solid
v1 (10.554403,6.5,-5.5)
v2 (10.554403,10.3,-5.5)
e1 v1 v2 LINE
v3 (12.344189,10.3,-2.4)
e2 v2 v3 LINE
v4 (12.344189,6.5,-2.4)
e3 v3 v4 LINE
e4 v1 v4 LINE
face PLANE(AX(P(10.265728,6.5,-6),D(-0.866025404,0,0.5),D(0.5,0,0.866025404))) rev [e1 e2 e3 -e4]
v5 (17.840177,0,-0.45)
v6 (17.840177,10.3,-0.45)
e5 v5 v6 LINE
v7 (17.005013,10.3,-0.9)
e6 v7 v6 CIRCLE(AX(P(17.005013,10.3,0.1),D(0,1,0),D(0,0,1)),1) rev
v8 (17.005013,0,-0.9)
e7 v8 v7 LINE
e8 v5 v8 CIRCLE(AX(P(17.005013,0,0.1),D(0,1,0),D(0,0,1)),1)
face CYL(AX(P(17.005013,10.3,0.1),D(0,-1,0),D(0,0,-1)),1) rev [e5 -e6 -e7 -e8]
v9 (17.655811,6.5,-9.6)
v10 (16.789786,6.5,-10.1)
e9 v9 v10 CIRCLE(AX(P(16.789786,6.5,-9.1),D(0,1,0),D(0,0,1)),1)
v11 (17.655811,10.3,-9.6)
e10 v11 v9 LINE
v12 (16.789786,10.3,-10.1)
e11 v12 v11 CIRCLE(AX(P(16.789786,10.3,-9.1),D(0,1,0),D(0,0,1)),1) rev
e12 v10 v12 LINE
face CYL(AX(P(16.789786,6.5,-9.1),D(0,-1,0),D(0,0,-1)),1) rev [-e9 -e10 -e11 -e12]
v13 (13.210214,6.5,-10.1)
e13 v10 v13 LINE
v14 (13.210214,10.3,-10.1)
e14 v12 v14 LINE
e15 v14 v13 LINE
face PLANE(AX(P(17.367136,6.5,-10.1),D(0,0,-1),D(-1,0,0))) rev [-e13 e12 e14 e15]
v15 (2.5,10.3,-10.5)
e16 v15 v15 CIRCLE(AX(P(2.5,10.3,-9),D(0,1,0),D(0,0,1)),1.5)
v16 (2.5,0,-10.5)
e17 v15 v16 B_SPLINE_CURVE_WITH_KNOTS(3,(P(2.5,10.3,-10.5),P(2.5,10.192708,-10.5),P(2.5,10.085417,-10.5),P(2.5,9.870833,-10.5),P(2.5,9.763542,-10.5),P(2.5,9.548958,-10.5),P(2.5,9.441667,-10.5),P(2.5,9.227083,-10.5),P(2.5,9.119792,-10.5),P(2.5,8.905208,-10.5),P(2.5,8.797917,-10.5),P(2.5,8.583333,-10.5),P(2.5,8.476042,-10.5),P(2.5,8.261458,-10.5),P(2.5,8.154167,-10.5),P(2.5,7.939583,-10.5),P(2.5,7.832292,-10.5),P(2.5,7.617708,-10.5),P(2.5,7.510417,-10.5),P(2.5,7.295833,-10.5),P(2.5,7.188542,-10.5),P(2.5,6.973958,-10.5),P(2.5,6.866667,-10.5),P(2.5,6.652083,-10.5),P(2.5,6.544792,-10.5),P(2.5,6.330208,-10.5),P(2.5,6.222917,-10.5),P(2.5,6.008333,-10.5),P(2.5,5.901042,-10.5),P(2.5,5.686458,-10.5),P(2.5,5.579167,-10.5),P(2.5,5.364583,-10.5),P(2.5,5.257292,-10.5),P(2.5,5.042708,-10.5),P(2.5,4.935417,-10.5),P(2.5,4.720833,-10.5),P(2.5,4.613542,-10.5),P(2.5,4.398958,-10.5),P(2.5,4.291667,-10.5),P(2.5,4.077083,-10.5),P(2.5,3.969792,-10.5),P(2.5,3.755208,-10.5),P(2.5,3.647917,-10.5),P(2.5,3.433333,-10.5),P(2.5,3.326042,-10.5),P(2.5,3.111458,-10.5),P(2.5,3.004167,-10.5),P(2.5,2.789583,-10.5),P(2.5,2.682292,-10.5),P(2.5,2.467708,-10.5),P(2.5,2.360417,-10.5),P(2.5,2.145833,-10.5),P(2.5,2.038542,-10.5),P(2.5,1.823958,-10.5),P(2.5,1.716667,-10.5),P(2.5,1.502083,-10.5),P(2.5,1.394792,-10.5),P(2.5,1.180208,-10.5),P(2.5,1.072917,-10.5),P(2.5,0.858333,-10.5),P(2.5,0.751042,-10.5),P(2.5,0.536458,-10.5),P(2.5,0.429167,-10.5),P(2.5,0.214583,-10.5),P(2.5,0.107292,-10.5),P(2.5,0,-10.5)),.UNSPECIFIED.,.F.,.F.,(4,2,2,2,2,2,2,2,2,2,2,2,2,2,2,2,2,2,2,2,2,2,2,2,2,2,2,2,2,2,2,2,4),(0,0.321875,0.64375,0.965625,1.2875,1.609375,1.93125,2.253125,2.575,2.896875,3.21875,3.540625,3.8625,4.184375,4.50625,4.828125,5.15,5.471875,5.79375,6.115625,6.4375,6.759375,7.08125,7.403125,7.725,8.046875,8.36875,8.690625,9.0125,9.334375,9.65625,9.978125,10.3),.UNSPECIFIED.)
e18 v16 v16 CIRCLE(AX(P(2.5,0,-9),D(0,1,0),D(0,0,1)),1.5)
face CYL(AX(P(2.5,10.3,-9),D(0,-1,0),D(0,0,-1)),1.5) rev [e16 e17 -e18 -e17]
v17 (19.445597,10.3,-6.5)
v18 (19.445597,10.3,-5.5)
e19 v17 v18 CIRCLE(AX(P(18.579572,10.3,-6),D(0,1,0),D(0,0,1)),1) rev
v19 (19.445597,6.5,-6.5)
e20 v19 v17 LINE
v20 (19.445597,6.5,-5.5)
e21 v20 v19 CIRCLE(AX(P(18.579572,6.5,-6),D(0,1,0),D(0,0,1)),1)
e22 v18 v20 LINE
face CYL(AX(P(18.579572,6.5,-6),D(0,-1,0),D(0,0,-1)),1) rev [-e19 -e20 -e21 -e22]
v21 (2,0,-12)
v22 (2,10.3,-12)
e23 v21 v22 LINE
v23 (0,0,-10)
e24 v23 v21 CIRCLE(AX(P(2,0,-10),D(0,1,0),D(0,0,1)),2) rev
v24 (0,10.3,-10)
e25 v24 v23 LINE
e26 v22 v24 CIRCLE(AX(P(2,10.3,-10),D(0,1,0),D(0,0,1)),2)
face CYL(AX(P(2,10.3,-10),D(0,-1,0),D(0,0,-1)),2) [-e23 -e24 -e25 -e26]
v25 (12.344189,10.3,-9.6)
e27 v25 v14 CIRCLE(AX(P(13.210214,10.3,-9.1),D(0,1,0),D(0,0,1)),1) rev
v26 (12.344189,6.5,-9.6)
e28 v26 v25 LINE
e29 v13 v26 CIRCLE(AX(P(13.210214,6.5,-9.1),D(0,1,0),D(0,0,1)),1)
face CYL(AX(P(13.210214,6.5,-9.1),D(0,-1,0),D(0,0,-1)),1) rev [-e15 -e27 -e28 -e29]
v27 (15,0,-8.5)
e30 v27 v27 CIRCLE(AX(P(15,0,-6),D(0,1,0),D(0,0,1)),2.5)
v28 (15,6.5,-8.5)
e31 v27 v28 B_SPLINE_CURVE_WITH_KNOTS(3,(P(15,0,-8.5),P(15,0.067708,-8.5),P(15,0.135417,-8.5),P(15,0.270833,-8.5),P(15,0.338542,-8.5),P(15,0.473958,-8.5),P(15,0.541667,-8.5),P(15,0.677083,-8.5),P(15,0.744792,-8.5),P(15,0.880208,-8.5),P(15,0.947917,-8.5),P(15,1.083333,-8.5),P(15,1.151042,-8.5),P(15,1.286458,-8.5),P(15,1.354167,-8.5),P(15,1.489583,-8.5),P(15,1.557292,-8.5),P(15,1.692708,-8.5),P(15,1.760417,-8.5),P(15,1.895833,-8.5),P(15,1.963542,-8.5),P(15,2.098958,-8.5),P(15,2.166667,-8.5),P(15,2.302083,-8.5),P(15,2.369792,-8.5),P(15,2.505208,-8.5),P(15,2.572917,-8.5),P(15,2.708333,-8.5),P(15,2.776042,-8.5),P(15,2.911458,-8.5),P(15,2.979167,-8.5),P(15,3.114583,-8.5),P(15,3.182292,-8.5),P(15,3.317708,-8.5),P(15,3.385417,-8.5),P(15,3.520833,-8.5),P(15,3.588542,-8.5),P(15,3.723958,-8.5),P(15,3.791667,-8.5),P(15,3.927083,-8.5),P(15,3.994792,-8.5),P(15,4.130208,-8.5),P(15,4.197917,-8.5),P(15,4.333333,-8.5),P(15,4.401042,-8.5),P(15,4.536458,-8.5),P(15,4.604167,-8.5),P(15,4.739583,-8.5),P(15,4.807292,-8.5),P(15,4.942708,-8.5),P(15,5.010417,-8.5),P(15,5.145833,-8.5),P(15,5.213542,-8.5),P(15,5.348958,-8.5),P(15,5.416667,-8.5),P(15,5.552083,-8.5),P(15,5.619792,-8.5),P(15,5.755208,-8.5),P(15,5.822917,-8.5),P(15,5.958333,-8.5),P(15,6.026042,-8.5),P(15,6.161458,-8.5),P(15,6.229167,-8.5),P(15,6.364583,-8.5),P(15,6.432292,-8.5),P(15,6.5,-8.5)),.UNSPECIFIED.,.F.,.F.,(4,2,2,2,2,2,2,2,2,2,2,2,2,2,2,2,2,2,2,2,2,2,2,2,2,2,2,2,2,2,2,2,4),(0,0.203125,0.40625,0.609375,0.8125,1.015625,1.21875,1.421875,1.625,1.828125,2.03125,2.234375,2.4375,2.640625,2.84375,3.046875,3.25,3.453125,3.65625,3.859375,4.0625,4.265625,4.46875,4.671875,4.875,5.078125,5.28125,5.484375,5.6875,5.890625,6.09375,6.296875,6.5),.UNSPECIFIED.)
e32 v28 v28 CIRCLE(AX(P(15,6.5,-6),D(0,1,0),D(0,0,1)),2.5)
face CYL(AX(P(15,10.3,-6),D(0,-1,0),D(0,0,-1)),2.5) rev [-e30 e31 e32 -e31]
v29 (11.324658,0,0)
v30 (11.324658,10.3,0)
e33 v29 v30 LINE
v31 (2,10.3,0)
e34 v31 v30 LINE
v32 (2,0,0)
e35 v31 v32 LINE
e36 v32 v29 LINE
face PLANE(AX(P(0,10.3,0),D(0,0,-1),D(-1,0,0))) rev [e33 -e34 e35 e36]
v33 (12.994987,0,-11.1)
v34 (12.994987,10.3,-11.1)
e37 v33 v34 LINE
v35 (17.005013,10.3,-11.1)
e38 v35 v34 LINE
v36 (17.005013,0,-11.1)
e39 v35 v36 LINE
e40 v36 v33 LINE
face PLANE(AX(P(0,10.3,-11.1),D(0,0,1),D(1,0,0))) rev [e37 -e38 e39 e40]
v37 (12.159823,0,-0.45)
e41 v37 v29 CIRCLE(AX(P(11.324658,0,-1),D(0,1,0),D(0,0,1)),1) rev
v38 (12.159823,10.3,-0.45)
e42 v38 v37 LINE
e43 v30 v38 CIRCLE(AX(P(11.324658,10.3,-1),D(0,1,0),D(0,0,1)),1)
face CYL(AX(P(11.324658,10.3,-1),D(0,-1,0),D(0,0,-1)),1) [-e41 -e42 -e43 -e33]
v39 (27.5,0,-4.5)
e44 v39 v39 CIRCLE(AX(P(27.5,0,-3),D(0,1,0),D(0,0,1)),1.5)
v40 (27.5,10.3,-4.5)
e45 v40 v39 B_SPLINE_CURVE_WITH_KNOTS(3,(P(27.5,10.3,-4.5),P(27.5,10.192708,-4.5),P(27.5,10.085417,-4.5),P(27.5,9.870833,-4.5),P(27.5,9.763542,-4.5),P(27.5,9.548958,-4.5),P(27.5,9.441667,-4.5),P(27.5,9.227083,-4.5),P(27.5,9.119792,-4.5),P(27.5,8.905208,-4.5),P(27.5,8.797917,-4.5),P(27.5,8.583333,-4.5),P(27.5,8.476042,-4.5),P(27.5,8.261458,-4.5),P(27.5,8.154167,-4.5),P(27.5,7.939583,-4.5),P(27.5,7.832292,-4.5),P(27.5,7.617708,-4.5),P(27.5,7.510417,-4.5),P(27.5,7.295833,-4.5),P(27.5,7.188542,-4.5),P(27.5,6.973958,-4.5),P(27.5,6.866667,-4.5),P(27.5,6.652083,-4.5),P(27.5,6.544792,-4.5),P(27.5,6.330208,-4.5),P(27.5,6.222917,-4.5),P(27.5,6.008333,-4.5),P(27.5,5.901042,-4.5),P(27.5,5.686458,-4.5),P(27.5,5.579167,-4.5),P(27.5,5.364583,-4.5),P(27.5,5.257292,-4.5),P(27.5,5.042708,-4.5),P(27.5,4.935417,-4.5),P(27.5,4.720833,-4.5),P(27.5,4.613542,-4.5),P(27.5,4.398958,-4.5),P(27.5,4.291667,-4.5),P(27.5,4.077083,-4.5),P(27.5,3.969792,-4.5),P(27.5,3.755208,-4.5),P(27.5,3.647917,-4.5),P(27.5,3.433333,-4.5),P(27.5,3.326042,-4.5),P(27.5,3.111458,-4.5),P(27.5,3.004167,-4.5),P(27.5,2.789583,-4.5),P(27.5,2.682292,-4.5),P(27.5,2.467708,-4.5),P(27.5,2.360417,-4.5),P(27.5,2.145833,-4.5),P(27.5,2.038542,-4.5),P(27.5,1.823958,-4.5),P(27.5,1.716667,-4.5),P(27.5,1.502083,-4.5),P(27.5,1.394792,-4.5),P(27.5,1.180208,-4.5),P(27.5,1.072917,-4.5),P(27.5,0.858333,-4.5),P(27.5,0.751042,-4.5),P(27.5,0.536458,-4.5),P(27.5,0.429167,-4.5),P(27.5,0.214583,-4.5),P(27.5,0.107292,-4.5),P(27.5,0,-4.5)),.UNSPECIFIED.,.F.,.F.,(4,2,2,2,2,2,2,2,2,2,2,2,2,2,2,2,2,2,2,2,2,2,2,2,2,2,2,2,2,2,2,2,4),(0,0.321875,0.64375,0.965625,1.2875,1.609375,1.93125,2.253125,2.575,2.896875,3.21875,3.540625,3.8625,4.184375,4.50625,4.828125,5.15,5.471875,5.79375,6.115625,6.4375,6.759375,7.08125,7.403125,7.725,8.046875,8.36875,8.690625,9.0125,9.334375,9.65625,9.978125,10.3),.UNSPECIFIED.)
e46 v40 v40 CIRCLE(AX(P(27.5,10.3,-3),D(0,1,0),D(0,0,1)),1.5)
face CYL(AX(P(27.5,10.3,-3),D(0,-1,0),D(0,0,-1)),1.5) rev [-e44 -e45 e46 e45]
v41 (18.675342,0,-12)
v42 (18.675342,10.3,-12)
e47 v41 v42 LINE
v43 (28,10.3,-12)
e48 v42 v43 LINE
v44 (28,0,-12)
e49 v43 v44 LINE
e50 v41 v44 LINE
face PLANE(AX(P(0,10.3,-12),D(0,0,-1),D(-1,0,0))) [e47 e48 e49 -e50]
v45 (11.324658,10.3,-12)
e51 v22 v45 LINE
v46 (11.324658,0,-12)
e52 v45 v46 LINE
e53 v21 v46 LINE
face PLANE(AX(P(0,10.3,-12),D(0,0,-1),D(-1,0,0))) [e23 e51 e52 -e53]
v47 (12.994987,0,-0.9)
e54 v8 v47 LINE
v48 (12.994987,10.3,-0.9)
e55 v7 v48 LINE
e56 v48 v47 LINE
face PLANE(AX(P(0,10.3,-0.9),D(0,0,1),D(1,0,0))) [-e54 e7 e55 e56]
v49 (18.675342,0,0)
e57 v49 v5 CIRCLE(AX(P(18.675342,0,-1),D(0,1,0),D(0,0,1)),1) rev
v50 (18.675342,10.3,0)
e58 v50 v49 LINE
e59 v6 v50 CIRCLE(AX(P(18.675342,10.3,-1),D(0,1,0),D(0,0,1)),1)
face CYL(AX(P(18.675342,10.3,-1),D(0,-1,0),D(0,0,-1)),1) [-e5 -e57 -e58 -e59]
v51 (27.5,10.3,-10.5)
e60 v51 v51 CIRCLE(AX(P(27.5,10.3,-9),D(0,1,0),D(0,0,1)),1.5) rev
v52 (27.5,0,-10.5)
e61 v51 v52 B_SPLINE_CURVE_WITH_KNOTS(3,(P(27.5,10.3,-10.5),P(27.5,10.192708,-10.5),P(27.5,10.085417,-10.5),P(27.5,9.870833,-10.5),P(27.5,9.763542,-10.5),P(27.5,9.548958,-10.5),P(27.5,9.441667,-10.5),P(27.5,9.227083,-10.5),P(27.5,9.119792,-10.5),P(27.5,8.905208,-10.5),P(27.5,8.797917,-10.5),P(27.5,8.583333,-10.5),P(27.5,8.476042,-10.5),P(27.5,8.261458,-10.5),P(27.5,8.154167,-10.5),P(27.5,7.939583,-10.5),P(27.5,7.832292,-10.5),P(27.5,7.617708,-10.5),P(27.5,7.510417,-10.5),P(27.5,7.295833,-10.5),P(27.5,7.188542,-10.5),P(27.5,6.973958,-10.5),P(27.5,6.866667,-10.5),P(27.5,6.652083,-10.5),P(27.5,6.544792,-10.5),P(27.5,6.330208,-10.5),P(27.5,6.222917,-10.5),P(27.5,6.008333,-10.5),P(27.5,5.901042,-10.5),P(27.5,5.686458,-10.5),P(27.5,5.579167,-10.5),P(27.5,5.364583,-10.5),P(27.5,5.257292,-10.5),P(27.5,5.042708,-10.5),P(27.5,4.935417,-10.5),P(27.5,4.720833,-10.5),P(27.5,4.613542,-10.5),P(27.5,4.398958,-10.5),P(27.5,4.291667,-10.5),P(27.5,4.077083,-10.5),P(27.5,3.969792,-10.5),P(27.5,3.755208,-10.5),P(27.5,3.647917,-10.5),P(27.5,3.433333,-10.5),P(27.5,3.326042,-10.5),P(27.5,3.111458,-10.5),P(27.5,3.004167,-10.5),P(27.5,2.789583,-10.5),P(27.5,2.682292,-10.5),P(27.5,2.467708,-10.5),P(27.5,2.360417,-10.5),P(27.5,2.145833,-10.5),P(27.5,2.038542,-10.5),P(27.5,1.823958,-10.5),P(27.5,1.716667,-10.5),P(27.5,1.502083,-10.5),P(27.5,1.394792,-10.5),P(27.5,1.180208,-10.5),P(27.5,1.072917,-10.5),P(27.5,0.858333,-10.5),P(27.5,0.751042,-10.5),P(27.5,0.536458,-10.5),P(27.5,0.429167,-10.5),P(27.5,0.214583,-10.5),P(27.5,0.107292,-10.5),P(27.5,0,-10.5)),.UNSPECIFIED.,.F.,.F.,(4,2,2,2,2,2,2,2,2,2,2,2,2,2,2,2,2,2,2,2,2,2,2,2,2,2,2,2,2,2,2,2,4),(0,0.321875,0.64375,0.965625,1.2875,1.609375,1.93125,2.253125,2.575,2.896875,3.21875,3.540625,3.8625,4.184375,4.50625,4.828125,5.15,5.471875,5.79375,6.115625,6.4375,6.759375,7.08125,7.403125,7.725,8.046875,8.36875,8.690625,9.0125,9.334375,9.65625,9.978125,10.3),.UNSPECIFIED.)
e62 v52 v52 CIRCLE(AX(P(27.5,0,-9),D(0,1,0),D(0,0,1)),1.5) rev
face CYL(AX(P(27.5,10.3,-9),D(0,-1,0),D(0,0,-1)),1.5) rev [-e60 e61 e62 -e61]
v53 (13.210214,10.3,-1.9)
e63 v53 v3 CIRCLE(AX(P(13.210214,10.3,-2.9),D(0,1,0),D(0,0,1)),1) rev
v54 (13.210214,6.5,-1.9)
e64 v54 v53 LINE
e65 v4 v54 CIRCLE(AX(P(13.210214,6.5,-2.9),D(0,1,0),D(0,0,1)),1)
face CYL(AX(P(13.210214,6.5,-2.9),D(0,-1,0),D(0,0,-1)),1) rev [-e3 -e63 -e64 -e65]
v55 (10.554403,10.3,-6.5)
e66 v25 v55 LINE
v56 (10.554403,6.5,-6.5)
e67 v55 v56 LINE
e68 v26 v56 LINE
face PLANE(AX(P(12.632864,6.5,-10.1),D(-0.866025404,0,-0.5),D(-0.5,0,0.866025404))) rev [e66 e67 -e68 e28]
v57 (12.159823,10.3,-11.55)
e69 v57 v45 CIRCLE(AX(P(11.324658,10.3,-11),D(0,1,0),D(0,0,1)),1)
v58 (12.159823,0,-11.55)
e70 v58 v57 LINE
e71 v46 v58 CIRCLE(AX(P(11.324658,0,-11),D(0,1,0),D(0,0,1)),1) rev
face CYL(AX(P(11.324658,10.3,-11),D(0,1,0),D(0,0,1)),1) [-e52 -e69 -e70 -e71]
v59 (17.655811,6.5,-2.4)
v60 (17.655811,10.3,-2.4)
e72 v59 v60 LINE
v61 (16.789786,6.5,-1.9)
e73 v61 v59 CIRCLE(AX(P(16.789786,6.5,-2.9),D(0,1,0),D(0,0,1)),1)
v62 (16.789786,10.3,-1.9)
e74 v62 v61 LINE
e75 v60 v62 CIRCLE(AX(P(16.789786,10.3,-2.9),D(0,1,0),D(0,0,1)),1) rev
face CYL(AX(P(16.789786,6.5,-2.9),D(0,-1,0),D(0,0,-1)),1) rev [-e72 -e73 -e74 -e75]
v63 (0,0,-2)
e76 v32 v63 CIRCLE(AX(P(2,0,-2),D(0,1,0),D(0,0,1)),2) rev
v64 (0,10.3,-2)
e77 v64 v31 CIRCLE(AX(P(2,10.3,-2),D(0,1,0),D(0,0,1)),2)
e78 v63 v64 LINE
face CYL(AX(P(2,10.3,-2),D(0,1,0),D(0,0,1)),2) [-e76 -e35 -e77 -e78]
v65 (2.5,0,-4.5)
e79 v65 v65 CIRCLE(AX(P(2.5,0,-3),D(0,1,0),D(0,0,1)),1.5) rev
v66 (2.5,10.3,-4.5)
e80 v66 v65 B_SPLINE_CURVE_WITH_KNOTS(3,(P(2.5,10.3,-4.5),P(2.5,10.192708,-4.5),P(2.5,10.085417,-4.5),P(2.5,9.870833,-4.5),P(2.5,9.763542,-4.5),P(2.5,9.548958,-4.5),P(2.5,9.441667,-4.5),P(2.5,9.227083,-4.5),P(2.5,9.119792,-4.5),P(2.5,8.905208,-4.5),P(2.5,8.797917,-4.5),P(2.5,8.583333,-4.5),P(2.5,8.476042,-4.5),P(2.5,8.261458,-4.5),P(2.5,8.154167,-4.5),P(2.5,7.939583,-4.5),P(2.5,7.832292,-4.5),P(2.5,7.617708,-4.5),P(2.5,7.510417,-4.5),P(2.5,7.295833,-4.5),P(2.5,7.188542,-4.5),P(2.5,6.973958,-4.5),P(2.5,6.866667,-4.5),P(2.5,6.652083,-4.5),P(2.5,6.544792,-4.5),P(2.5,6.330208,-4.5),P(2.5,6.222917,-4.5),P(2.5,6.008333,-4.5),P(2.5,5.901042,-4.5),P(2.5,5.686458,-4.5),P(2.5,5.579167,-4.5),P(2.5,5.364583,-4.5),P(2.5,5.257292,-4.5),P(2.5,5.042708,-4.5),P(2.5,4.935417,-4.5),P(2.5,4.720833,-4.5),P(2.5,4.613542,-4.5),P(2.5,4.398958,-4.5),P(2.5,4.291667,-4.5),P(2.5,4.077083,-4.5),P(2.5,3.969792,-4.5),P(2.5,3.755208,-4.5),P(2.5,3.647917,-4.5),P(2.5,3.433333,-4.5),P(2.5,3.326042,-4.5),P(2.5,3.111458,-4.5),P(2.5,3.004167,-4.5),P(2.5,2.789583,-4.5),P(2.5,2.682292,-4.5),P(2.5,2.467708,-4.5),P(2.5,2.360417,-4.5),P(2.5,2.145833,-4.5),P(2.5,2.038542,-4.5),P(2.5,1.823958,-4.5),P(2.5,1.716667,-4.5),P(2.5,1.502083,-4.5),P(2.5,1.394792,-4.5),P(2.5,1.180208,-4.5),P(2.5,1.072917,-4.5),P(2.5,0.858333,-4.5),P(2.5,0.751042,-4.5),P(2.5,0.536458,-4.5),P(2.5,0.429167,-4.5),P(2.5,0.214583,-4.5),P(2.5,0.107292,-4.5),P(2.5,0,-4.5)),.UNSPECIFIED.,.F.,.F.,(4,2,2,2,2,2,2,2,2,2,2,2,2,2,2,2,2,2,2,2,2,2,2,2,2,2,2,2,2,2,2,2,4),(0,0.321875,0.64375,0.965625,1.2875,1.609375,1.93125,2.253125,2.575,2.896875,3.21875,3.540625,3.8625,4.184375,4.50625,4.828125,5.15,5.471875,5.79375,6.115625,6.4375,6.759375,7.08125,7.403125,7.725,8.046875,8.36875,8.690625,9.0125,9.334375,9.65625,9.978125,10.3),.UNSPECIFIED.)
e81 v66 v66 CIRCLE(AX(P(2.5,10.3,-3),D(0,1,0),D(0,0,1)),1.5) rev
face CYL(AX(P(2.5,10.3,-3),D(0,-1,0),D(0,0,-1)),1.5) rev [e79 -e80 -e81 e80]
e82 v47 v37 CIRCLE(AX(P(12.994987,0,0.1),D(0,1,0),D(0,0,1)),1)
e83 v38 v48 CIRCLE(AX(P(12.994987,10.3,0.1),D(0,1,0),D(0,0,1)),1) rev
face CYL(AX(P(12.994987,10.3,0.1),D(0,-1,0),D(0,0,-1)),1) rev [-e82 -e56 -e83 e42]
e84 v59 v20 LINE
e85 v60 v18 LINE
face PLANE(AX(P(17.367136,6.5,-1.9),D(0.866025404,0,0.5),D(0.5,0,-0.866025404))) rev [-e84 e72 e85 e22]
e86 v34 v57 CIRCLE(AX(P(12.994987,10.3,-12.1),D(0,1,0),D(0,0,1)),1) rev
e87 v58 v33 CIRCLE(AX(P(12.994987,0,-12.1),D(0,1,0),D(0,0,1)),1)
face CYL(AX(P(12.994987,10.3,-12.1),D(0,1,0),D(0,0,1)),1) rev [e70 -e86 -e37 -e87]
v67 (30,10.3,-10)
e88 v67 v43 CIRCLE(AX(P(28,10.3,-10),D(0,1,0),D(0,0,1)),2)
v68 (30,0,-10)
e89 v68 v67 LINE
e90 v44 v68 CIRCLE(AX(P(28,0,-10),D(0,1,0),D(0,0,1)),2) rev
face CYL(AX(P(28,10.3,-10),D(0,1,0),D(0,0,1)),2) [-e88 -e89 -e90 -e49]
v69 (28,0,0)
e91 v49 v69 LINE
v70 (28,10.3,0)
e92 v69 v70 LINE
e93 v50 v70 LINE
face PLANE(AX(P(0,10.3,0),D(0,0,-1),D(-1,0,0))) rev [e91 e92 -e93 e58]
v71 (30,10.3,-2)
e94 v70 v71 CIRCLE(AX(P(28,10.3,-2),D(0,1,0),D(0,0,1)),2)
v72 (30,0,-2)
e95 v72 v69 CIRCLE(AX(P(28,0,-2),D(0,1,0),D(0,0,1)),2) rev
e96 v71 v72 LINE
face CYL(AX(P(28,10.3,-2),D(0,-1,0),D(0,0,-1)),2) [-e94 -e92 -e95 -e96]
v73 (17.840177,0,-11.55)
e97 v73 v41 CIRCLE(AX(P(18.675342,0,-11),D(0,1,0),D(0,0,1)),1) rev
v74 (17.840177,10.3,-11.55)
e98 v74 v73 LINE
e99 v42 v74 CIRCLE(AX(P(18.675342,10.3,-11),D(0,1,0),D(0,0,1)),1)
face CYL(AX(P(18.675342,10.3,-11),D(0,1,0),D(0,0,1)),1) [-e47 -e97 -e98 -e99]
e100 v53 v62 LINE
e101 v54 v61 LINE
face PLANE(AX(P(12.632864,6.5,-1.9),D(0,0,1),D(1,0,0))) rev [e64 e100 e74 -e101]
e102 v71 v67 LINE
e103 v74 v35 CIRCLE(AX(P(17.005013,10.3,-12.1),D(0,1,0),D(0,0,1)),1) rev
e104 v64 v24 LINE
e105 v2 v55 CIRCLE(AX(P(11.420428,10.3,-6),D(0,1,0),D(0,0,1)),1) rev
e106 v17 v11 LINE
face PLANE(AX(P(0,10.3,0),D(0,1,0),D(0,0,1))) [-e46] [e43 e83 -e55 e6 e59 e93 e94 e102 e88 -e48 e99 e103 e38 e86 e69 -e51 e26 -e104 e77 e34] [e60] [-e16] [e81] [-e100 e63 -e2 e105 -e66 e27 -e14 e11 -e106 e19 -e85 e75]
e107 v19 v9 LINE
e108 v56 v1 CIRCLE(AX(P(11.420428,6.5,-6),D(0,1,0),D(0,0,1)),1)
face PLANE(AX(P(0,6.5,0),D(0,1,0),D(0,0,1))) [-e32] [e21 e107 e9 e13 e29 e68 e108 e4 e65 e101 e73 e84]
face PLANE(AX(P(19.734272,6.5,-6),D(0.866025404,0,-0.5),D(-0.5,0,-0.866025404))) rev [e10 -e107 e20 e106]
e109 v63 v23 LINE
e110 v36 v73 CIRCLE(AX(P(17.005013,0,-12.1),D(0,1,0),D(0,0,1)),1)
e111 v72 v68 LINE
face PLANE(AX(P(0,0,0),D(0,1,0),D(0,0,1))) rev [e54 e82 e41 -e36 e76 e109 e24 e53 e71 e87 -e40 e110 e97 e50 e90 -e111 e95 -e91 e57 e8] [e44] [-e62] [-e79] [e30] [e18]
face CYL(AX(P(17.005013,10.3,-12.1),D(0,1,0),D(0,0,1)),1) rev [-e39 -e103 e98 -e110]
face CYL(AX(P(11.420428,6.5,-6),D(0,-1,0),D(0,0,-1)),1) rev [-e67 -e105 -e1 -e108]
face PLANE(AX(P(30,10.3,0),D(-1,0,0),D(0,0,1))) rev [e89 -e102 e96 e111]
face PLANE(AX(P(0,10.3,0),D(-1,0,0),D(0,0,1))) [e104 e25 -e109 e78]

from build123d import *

# Parameters (mm, degrees)
SKETCH_1_R          = 1.5
SKETCH_1_R_2        = 2.5
EXTRUDE_1_DEPTH     = 10.3
CUT_EXTRUDE_1_DEPTH = 3.8
FILLET_1_R          = 2
FILLET_2_R          = 1
FILLET_3_R          = 1
FILLET_4_R          = 1


with BuildPart() as part:
    # 草图1 → 凸台-拉伸1 (new body)
    with BuildSketch(Plane(origin=(0, 0, 0), x_dir=(1, 0, 0), z_dir=(0, 1, 0))):
        Polygon((0, 12), (0, 0), (12, 0), (12, 0.9), (18, 0.9), (18, 0), (30, 0), (30, 12), (18, 12), (18, 11.1), (12, 11.1), (12, 12), align=None)
        with Locations(Location((2.5, 3, 0), (0, 0, 90))):
            Circle(SKETCH_1_R, mode=Mode.SUBTRACT)
        with Locations(Location((15, 6, 0), (0, 0, 90))):
            Circle(SKETCH_1_R_2, mode=Mode.SUBTRACT)
        with Locations(Location((27.5, 3, 0), (0, 0, 90))):
            Circle(SKETCH_1_R, mode=Mode.SUBTRACT)
        with Locations(Location((2.5, 9, 0), (0, 0, 90))):
            Circle(SKETCH_1_R, mode=Mode.SUBTRACT)
        with Locations(Location((27.5, 9, 0), (0, 0, 90))):
            Circle(SKETCH_1_R, mode=Mode.SUBTRACT)
    extrude(amount=EXTRUDE_1_DEPTH)

    # 草图2 → 切除-拉伸1 (cut)
    with BuildSketch(Plane(origin=(0, 10.3, 0), x_dir=(1, 0, 0), z_dir=(0, 1, 0))):
        Polygon((10.265727793, 6), (12.632863896, 1.9), (17.367136104, 1.9), (19.734272207, 6), (17.367136104, 10.1), (12.632863896, 10.1), align=None)
    extrude(amount=-CUT_EXTRUDE_1_DEPTH, mode=Mode.SUBTRACT)

    # 圆角1
    fillet_1_edges = [part.edges().sort_by_distance(p)[0] for p in [
        (30, 5.15, -12),
        (30, 5.15, 0),
        (0, 5.15, 0),
        (0, 5.15, -12),
    ]]
    fillet(fillet_1_edges, radius=FILLET_1_R)

    # 圆角2
    fillet_2_edges = [part.edges().sort_by_distance(p)[0] for p in [
        (10.265727793, 8.4, -6),
        (12.632863896, 8.4, -10.1),
        (17.367136104, 8.4, -10.1),
        (19.734272207, 8.4, -6),
        (17.367136104, 8.4, -1.9),
        (12.632863896, 8.4, -1.9),
    ]]
    fillet(fillet_2_edges, radius=FILLET_2_R)

    # 圆角3
    # the kernel refuses this fillet: 1 mm, written as the material it adds along each edge
    with BuildSketch(Plane(origin=(12, 0, -0.9), x_dir=(0, 0, 1), z_dir=(0, 1, 0))) as fillet_3_piece_1:
        with BuildLine():
            CenterArc((1, 0.994987437), FILLET_3_R, 180, 84.260829523)
            Line((0, 0.994987437), (-0.02, 0.994987437))
            Line((-0.02, 0.994987437), (-0.02, 0))
            Line((-0.02, 0), (0, -0.02))
            ThreePointArc((0, -0.02), (0.45, -0.02), (0.898, -0.019899749))
            Line((0.898, -0.019899749), (0.9, 0))
        make_face()
    extrude(amount=10.3)
    with BuildSketch(Plane(origin=(18, 0, -0.9), x_dir=(-1, 0, 0), z_dir=(0, 1, 0))) as fillet_3_piece_2:
        with BuildLine():
            CenterArc((0.994987437, 1), FILLET_3_R, 185.739170477, 84.260829523)
            Line((0, 0.9), (-0.019899749, 0.898))
            ThreePointArc((-0.019899749, 0.898), (-0.02, 0.45), (-0.02, 0))
            Line((-0.02, 0), (0, -0.02))
            Line((0, -0.02), (0.994987437, -0.02))
            Line((0.994987437, -0.02), (0.994987437, 0))
        make_face()
    extrude(amount=10.3)
    with BuildSketch(Plane(origin=(12, 0, -11.1), x_dir=(0, 0, -1), z_dir=(0, 1, 0))) as fillet_3_piece_3:
        with BuildLine():
            CenterArc((1, -0.994987437), FILLET_3_R, 95.739170477, 84.260829523)
            Line((0, -0.994987437), (-0.02, -0.994987437))
            Line((-0.02, -0.994987437), (-0.02, 0))
            Line((-0.02, 0), (0, 0.02))
            ThreePointArc((0, 0.02), (0.45, 0.02), (0.898, 0.019899749))
            Line((0.898, 0.019899749), (0.9, 0))
        make_face()
    extrude(amount=10.3)
    with BuildSketch(Plane(origin=(18, 0, -11.1), x_dir=(-1, 0, 0), z_dir=(0, 1, 0))) as fillet_3_piece_4:
        with BuildLine():
            CenterArc((0.994987437, -1), FILLET_3_R, 90, 84.260829523)
            Line((0, -0.9), (-0.019899749, -0.898))
            ThreePointArc((-0.019899749, -0.898), (-0.02, -0.45), (-0.02, 0))
            Line((-0.02, 0), (0, 0.02))
            Line((0, 0.02), (0.994987437, 0.02))
            Line((0.994987437, 0.02), (0.994987437, 0))
        make_face()
    extrude(amount=10.3)

    # 圆角4
    fillet_4_edges = [part.edges().sort_by_distance(p)[0] for p in [
        (18, 5.15, 0),
        (12, 5.15, 0),
        (12, 5.15, -12),
        (18, 5.15, -12),
    ]]
    fillet(fillet_4_edges, radius=FILLET_4_R)


solid = part.part
